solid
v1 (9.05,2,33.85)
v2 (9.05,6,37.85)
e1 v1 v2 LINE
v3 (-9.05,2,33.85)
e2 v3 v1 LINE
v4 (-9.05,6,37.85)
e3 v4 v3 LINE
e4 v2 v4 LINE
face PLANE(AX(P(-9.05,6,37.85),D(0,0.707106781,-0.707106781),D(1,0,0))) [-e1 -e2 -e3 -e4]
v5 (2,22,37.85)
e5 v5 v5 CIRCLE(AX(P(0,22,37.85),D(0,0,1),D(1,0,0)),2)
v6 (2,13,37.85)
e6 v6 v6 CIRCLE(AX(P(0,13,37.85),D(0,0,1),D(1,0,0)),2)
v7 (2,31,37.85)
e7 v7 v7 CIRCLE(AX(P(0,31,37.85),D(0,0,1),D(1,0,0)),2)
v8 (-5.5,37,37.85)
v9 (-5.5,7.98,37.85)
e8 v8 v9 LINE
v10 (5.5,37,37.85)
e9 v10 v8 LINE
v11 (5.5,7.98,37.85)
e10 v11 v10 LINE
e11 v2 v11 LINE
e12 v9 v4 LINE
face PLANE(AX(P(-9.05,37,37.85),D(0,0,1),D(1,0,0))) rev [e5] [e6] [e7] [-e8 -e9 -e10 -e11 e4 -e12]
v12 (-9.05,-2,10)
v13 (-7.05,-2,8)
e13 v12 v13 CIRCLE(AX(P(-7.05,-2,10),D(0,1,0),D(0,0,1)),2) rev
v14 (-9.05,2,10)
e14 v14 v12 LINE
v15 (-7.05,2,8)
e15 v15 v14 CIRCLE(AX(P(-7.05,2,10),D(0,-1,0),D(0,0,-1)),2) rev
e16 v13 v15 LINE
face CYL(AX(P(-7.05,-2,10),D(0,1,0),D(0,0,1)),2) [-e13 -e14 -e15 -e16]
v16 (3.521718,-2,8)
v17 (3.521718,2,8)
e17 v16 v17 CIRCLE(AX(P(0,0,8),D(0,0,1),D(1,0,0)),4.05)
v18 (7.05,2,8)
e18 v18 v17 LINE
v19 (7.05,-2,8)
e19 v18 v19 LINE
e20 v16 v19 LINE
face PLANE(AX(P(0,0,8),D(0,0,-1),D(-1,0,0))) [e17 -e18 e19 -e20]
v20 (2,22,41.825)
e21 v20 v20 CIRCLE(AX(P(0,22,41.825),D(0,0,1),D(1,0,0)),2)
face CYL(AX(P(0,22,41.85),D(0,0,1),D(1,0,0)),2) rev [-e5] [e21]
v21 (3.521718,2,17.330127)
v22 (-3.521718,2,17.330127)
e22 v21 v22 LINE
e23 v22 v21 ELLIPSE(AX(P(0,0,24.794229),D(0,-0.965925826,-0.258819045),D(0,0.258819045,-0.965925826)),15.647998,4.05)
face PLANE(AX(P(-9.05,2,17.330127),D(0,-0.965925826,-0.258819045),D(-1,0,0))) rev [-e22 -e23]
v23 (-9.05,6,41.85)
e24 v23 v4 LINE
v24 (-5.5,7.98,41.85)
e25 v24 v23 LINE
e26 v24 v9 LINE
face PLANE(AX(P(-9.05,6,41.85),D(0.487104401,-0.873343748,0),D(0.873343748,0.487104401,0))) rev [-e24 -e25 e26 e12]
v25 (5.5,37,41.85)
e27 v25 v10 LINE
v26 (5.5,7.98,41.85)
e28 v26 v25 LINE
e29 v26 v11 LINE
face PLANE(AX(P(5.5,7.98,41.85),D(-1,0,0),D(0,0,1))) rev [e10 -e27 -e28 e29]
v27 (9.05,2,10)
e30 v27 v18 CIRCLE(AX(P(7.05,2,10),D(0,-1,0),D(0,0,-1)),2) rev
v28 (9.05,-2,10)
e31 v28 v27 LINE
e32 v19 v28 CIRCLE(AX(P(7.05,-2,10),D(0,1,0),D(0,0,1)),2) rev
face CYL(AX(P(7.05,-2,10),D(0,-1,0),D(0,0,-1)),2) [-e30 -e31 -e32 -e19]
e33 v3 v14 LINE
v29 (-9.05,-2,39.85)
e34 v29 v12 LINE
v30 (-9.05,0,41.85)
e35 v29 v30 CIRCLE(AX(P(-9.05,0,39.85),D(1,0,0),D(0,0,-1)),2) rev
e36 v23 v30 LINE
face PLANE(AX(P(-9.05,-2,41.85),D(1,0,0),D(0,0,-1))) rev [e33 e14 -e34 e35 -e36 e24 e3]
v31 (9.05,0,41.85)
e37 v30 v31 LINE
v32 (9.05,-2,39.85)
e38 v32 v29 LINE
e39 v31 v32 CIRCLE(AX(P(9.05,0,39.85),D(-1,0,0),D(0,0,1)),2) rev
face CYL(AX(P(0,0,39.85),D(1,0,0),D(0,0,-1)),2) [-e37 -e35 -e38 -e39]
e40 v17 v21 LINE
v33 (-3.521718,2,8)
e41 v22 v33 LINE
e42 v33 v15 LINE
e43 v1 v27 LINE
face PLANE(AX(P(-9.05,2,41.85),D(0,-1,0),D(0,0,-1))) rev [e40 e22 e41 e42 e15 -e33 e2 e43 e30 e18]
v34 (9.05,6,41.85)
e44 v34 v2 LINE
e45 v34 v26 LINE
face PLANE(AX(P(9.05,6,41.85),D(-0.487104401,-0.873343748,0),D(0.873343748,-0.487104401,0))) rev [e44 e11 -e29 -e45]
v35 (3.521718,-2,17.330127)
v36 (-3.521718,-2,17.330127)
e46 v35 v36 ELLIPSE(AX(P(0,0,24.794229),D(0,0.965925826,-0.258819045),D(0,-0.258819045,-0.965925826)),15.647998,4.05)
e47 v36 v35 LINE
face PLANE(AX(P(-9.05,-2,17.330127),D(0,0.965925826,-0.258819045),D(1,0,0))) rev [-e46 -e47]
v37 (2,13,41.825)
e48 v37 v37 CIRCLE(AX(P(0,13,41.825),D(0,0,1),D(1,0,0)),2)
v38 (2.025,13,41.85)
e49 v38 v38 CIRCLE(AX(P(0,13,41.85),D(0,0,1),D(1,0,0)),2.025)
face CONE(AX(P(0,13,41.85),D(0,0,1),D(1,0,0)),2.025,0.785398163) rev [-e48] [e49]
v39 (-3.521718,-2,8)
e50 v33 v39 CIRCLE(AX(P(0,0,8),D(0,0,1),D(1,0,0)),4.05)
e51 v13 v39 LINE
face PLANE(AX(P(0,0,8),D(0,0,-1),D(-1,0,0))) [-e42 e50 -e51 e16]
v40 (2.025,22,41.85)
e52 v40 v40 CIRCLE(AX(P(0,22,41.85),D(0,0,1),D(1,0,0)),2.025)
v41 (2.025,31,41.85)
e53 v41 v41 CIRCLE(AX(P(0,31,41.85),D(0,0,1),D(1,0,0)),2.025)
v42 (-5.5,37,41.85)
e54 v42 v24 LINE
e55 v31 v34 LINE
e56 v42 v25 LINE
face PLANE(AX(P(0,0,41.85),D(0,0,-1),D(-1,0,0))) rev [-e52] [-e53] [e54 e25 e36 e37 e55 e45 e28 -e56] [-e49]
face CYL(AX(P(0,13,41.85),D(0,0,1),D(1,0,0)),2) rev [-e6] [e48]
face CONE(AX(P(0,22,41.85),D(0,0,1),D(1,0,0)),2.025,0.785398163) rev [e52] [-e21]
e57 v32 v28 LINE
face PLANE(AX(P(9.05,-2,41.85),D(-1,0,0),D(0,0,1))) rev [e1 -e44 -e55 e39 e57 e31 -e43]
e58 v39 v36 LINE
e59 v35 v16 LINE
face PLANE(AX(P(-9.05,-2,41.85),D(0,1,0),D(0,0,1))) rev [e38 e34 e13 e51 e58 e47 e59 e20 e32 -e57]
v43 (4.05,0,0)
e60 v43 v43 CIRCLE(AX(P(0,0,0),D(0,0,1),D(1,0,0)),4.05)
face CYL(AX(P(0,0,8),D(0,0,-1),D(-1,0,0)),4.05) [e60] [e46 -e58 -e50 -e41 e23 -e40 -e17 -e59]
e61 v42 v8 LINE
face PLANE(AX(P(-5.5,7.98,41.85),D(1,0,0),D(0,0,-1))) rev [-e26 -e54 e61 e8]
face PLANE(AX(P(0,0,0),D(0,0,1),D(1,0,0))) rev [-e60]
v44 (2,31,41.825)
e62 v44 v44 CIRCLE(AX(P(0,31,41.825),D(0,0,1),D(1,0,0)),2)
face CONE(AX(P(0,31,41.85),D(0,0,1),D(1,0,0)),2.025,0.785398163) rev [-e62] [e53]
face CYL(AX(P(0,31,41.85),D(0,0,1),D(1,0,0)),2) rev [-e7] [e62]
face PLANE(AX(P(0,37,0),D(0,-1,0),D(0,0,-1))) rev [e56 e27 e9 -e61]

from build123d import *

# Parameters (mm, degrees)
SKETCH1_R                       = 4.05
BOSS_EXTRUDE1_DEPTH             = 8
SKETCH2_W                       = 18.1
SKETCH2_H                       = 4
BOSS_EXTRUDE2_DEPTH             = 33.85
CHAMFER1_SIZE                   = 2.5
CHAMFER1_SIZE_2                 = 9.330127019
CHAMFER2_SIZE                   = 9.330127019
CHAMFER2_SIZE_2                 = 2.5
FILLET1_R                       = 2
SKETCH3_W                       = 18.1
SKETCH3_H                       = 4
BOSS_EXTRUDE3_DEPTH             = 35
CHAMFER3_SIZE                   = 4
F_4_0MM_DOWEL_HOLE1_D           = 4
F_4_0MM_DOWEL_HOLE1_CSINK_D     = 4.05
F_4_0MM_DOWEL_HOLE1_CSINK_ANGLE = 90
FILLET2_R                       = 2
CUT_EXTRUDE1_DEPTH              = 54.698463665
CUT_EXTRUDE1_DEPTH_BACK         = 54.698463665
CUT_EXTRUDE2_DEPTH              = 54.698463665
CUT_EXTRUDE2_DEPTH_BACK         = 54.698463665


with BuildPart() as part:
    # Sketch1 → Boss-Extrude1 (new body)
    with BuildSketch(Plane.XY):
        Circle(SKETCH1_R)
    extrude(amount=BOSS_EXTRUDE1_DEPTH)

    # Sketch2 → Boss-Extrude2 (add)
    with BuildSketch(Plane.XY.offset(8)):
        Rectangle(SKETCH2_W, SKETCH2_H)
    extrude(amount=BOSS_EXTRUDE2_DEPTH)

    # Chamfer1
    # the kernel refuses this chamfer: 9.330127019, 2.5 mm, written as the material it adds along each edge
    with BuildSketch(Plane(origin=(27.749460413, 2, 8), x_dir=(0, 0.9905000388259542, -0.1375124470212913), z_dir=(-1, 0, 0))) as chamfer1_piece_1_section:
        Polygon((CHAMFER1_SIZE * 0.990500038826, -CHAMFER1_SIZE * 0.137512447021), (-CHAMFER1_SIZE_2 * 0.13751244702, -CHAMFER1_SIZE_2 * 0.990500038818), (0, 0), align=None)
    chamfer1_piece_1 = extrude(amount=55.498920827, mode=Mode.PRIVATE)
    chamfer1_piece_1 = chamfer1_piece_1 & Plane(origin=(0, 0, 11.423628779), x_dir=(1, 0, 0), z_dir=(0, 0, -1)) * Cylinder(4.05, 148, mode=Mode.PRIVATE)
    add(chamfer1_piece_1)

    # Chamfer2
    # the kernel refuses this chamfer: 9.330127019, 2.5 mm, written as the material it adds along each edge
    with BuildSketch(Plane(origin=(-27.749460413, -2, 8), x_dir=(0, 0.009967146577156291, 0.9999503267608394), z_dir=(1, 0, 0))) as chamfer2_piece_1_section:
        Polygon((CHAMFER2_SIZE * 0.999950326753, CHAMFER2_SIZE * 0.00996714657707), (-CHAMFER2_SIZE_2 * 0.00996714657716, CHAMFER2_SIZE_2 * 0.999950326761), (0, 0), align=None)
    chamfer2_piece_1 = extrude(amount=55.498920827, mode=Mode.PRIVATE)
    chamfer2_piece_1 = chamfer2_piece_1 & Plane(origin=(0, 0, 11.423628779), x_dir=(1, 0, 0), z_dir=(0, 0, -1)) * Cylinder(4.05, 149, mode=Mode.PRIVATE)
    add(chamfer2_piece_1)

    # Fillet1
    fillet1_edges = [part.edges().sort_by_distance(p)[0] for p in [
        (9.05, 0, 8),
        (-9.05, 0, 8),
    ]]
    fillet(fillet1_edges, radius=FILLET1_R)

    # Sketch3 → Boss-Extrude3 (add)
    with BuildSketch(Plane(origin=(0, 2, 0), x_dir=(1, 0, 0), z_dir=(0, 1, 0))):
        with Locations((0, -39.85)):
            Rectangle(SKETCH3_W, SKETCH3_H)
    extrude(amount=BOSS_EXTRUDE3_DEPTH)

    # Chamfer3
    chamfer3_edges = [part.edges().sort_by_distance(p)[0] for p in [
        (0, 2, 37.85),
    ]]
    chamfer(chamfer3_edges, length=CHAMFER3_SIZE)

    # Ø4.0mm Dowel Hole1 (through all)
    with Locations(Plane.XY.offset(41.85)):
        with Locations((0, 31), (0, 22), (0, 13)):
            CounterSinkHole(F_4_0MM_DOWEL_HOLE1_D / 2, F_4_0MM_DOWEL_HOLE1_CSINK_D / 2, counter_sink_angle=F_4_0MM_DOWEL_HOLE1_CSINK_ANGLE)

    # Fillet2
    fillet2_edges = [part.edges().sort_by_distance(p)[0] for p in [
        (0, -2, 41.85),
    ]]
    fillet(fillet2_edges, radius=FILLET2_R)

    # Sketch6 → Cut-Extrude1 (cut, two sides: drawn at the far end of the back side and taken through both)
    with BuildSketch(Plane(origin=(0, 0, 37.85), x_dir=(-1, 0, 0), z_dir=(0, 0, -1)).offset(-CUT_EXTRUDE1_DEPTH_BACK)):
        Polygon((-9.05, 6), (-5.5, 7.98), (-5.5, 37), (-9.05, 37), align=None)
    extrude(amount=CUT_EXTRUDE1_DEPTH + CUT_EXTRUDE1_DEPTH_BACK, mode=Mode.SUBTRACT)

    # Sketch7 → Cut-Extrude2 (cut, two sides: drawn at the far end of the back side and taken through both)
    with BuildSketch(Plane(origin=(0, 0, 37.85), x_dir=(-1, 0, 0), z_dir=(0, 0, -1)).offset(-CUT_EXTRUDE2_DEPTH_BACK)):
        Polygon((9.05, 6), (5.5, 7.98), (5.5, 37), (9.05, 37), align=None)
    extrude(amount=CUT_EXTRUDE2_DEPTH + CUT_EXTRUDE2_DEPTH_BACK, mode=Mode.SUBTRACT)


solid = part.part
